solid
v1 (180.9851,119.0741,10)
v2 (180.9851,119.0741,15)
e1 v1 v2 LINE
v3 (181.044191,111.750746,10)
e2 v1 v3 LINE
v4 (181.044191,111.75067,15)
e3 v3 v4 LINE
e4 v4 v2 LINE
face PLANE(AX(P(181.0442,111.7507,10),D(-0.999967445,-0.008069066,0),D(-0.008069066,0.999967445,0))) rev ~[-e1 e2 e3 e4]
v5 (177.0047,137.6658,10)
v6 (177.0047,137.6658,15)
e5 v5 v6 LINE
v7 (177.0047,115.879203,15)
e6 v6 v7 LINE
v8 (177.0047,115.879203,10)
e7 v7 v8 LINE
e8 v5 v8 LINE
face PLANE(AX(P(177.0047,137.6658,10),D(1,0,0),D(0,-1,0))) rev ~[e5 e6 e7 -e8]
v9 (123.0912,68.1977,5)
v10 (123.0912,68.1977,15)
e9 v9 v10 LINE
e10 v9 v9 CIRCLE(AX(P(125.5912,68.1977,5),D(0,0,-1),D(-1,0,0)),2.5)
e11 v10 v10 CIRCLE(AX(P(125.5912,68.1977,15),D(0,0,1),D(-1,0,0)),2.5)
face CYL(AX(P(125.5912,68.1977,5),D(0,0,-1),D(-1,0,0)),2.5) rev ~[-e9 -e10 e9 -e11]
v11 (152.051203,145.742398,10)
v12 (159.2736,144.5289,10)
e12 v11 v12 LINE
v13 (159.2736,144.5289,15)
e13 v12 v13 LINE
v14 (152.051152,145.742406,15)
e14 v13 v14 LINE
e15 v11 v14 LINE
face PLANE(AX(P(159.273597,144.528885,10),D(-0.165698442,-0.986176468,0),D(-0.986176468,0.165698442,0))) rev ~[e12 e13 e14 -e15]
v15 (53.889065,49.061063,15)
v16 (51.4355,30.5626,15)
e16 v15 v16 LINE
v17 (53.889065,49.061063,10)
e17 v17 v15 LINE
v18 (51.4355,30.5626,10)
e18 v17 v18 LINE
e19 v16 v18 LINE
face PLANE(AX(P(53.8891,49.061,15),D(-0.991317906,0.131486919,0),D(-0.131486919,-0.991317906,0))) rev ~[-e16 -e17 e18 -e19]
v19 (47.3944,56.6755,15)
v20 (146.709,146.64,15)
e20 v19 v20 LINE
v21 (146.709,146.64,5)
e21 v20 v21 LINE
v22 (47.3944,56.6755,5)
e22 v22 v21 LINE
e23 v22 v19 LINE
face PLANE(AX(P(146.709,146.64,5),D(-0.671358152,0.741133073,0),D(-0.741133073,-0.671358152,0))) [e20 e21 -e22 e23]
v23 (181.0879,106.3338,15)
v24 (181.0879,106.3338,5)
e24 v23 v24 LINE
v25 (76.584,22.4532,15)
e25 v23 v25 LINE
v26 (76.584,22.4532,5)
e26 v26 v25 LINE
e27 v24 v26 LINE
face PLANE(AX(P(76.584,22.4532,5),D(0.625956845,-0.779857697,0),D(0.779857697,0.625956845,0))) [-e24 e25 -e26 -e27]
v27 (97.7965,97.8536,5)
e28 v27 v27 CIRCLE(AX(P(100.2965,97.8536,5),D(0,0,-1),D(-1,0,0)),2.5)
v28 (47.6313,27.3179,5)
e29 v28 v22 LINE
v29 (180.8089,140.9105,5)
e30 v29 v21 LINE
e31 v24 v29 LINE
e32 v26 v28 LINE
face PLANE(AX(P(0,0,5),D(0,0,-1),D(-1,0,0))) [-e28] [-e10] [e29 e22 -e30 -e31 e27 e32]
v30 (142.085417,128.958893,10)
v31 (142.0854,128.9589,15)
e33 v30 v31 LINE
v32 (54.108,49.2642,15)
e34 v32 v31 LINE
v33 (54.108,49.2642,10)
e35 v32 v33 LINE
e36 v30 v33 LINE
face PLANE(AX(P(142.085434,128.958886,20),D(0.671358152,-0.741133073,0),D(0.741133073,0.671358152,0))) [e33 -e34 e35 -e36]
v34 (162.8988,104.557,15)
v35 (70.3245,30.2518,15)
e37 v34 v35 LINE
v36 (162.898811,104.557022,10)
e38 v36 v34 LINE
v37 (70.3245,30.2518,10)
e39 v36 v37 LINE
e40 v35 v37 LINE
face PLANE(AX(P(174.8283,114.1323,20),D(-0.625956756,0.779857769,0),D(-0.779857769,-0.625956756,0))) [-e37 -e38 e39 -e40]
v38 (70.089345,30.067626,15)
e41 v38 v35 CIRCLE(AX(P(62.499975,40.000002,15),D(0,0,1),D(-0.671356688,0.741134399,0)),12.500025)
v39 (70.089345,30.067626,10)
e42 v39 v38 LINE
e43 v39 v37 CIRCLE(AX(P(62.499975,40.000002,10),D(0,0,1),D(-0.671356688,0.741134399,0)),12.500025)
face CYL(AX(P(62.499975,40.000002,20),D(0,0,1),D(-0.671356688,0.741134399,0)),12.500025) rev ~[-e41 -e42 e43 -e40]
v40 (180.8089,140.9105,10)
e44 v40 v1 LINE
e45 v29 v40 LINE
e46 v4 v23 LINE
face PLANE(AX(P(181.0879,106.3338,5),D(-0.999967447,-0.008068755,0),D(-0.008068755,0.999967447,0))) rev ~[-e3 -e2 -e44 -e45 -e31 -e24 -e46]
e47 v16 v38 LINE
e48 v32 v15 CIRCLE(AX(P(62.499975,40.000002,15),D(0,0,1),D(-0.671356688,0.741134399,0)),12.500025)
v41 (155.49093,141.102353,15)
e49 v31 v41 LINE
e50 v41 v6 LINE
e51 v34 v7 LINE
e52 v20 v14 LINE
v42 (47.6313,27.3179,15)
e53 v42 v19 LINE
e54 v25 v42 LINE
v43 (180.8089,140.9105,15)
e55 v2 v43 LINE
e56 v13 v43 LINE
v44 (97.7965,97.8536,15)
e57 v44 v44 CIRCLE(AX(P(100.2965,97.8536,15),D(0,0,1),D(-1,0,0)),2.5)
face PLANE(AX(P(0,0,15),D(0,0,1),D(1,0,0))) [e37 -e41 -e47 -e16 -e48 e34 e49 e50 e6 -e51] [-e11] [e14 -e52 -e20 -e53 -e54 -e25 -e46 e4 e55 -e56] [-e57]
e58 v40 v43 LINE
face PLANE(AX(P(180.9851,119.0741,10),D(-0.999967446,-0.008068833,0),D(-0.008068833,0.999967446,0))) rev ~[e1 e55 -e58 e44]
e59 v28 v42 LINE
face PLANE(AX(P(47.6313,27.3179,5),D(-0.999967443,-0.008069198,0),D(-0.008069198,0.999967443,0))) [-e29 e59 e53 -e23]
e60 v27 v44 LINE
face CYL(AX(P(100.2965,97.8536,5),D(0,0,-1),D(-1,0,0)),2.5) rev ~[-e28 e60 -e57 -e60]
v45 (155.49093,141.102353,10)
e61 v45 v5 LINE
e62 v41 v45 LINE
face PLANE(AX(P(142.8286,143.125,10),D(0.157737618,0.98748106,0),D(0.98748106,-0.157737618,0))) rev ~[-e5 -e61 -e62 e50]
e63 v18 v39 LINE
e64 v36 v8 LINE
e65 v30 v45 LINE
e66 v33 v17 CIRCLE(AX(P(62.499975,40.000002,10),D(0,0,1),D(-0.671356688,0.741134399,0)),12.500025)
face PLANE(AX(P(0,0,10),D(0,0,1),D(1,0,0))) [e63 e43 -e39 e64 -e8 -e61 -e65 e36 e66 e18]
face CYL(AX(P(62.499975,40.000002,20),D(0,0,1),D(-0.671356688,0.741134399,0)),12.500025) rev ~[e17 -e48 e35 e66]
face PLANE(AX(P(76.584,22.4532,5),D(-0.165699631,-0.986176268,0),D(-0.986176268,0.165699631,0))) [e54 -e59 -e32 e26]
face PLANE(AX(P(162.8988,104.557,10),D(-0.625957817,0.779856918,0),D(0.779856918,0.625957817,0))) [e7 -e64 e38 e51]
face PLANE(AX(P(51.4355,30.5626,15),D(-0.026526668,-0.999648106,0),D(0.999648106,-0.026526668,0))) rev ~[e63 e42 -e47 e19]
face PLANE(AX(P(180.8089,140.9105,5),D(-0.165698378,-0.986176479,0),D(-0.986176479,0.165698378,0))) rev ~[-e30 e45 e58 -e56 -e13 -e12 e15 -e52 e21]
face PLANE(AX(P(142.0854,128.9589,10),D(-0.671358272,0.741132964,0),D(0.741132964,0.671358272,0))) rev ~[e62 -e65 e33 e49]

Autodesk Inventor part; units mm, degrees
ref_plane "XZ Plane" through (0, 0, 0) normal (0, 1, 0) x (-1, 0, 0)
ref_plane "XY Plane" through (0, 0, 0) normal (0, 0, 1) x (1, 0, 0)
sketch "Sketch1" plane through (0, 0, 0) normal (0, 0, 1) x (1, 0, 0)
  line L0 (0, 0) -> (100, 0)
  line L1 (100, 0) -> (100, 25)
  line L2 (100, 25) -> (0, 25)
  line L3 (0, 25) -> (0, 0)
  line L4 (0, 25) -> (115.2078, 140.2078)
  line L5 (100, 0) -> (177.7078, 77.7078)
  line L6 (151.2922, 176.2922) -> (200.5844, 163.0844)
  line L7 (200.5844, 163.0844) -> (213.7922, 113.7922)
  line L8 (213.7922, 113.7922) -> (177.7078, 77.7078)
  line L9 (177.7078, 77.7078) -> (128.4156, 90.9156)
  line L10 (128.4156, 90.9156) -> (115.2078, 140.2078)
  line L11 (115.2078, 140.2078) -> (151.2922, 176.2922)
  circle A0 centre (164.5, 127) radius 4
  dimension "d0" = 100
  dimension "d1" = 25
  dimension "d6" = 8
  dimension "d8" = 45
  dimension "d15" = 127
extrude "Extrusion1" add sketch "Sketch1" along normal blind 20
sketch "Sketch2" plane through (0, 0, 20) normal (0, 0, 1) x (1, 0, 0)
  line L0 (0, 25) -> (0, 0) projected
  line L1 (0, 0) -> (100, 0) projected
  line L2 (0, 25) -> (100, 25)
  line L3 (100, 25) -> (100, 0)
  line L4 (100, 0) -> (0, 0)
  line L5 (0, 0) -> (0, 25)
  line L6 (100, 25) -> (125, 25)
  line L7 (100, 0) -> (213.7922, 113.7922) projected
  line L8 (100, 0) -> (125, 25)
extrude "Extrusion2" add sketch "Sketch2" along normal blind 250
sketch "Sketch4" plane through (0, 0, 270) normal (0, 0, 1) x (1, 0, 0)
  line L0 (0, 25) -> (125, 25) projected
  line L1 (125, 25) -> (213.7922, 113.7922) projected
  line L2 (213.7922, 113.7922) -> (200.5844, 163.0844) projected
  line L3 (200.5844, 163.0844) -> (151.2922, 176.2922) projected
  line L4 (151.2922, 176.2922) -> (0, 25) projected
  circle A0 centre (164.5, 127) radius 4 projected
  line L5 (100, 0) -> (125, 25) projected
  line L6 (125, 25) -> (0, 25) projected
  line L7 (0, 25) -> (0, 0) projected
  line L8 (0, 0) -> (100, 0) projected
extrude "Extrusion3" add sketch "Sketch4" along normal blind 20
sketch "Sketch5" plane through (0, 0, 0) normal (0, -1, 0) x (1, 0, 0)
  line L0 (0, 0) -> (100, 0) projected
  line L1 (100, 0) -> (100, 290) projected
  line L2 (0, 290) -> (100, 290) projected
  line L3 (0, 0) -> (0, 290) projected
  line L4 (0, 0) -> (-125.5737, 72.5)
  line L5 (-125.5737, 72.5) -> (-125.5737, 217.5)
  line L6 (-125.5737, 217.5) -> (0, 290)
  line L7 (0, 290) -> (125.5737, 217.5)
  line L8 (125.5737, 217.5) -> (125.5737, 72.5)
  line L9 (125.5737, 72.5) -> (0, 0)
  point P0 (0, 145)
extrude "Extrusion4" add sketch "Sketch5" against normal blind 25 contours L4 L5 L6 L3
sketch "Sketch6" plane through (0, 25, 20) normal (0, 1, 0) x (1, 0, 0)
  line L0 (100, 20) -> (100, -270) projected
  circle A0 centre (-24.528, -125) radius 3
  circle A1 centre (-31.528, -125) radius 1.5
  circle A2 centre (-21.028, -131.0622) radius 1.5
  circle A3 centre (-21.028, -118.9378) radius 1.5
  point P0 (0, 20)
  point P1 (100, -125)
  dimension "d18" = 6
  dimension "d19" = 124.528
  dimension "d20" = 3
  dimension "d21" = 7
  dimension "d24" = 360
extrude "Extrusion5" cut sketch "Sketch6" against normal through all
sketch "Sketch7" plane through (100, 0, 0) normal (0, -1, 0) x (1, 0, 0)
  circle A0 centre (-124.528, 145) radius 3 projected
  circle A1 centre (-124.528, 145) radius 12
  point P0 (-100, 0)
  dimension "d28" = 24
extrude "Extrusion6" cut sketch "Sketch7" against normal blind 5
sketch "Sketch8" plane through (0, 0, 270) normal (0, 0, -1) x (-1, 0, 0)
  circle A0 centre (-164.5, 127) radius 4 projected
  circle A1 centre (-164.5, 127) radius 12.5
  point P0 (0, 0)
  dimension "d31" = 25
extrude "Extrusion7" cut sketch "Sketch8" against normal blind 7
sketch "Sketch10" plane through (164.5, 127, 277) normal (0, 0, -1) x (-1, 0, 0)
  circle A0 centre (7, 0) radius 2
  circle A1 centre (0, 0) radius 4 projected
  circle A2 centre (-3.5, 6.0622) radius 2
  circle A3 centre (-3.5, -6.0622) radius 2
  point P0 (164.5, -127)
  dimension "d34" = 4
  dimension "d37" = 360
  dimension "d39" = 7
extrude "Extrusion8" cut sketch "Sketch10" against normal through all
sketch "Sketch11" plane through (0, 0, 290) normal (0, 0, 1) x (1, 0, 0)
  circle A0 centre (168, 133.0622) radius 2 projected
  circle A1 centre (164.5, 127) radius 4 projected
  circle A2 centre (168, 133.0622) radius 4
  circle A3 centre (157.5, 127) radius 4
  circle A4 centre (168, 120.9378) radius 4
  point P0 (0, 0)
  dimension "d42" = 8
  dimension "d45" = 360
extrude "Extrusion9" cut sketch "Sketch11" against normal blind 3 contours A0 | A1 A4 A3 A2 | A2 A1 | A1 A2 | A4 A1 | A1 A4 | A3 A1 | A1 A3
ref_plane "Work Plane1" through (164.5, 127, 270) normal (1, 0, 0) x (0, 0, 1)
sketch "Sketch12" plane through (164.5, 127, 270) normal (1, 0, 0) x (0, 0, 1)
  line L0 (17, -1.9365) -> (17, 1.9365) projected
  line L1 (17, 1.9365) -> (20, 1.9365) projected
  line L2 (20, 3.9993) -> (20, 1.9365) projected
  line L3 (20, 3.9993) -> (17, 3.9993) projected
  line L4 (17, 3.9993) -> (17, 2.0628) projected
  line L5 (17, 2.0628) -> (20, 2.0628) projected
  line L6 (20, -2.0628) -> (20, 2.0628) projected
  line L7 (20, -2.0628) -> (17, -2.0628) projected
  line L8 (17, -2.0628) -> (17, -3.9993) projected
  line L9 (17, -3.9993) -> (20, -3.9993) projected
  line L10 (20, -1.9365) -> (20, -3.9993) projected
  line L11 (20, -1.9365) -> (17, -1.9365) projected
  line L12 (7, 4) -> (7, -4) projected
  line L13 (7, -12.5) -> (7, 12.5) projected
  line L14 (0, -12.5) -> (0, 12.5) projected
  circle A0 centre (3.5, 0) radius 2
  line L15 (0, -12.5) -> (7, -12.5) projected
  point P0 (-270, 127)
  point P1 (7, 0)
  point P2 (3.5, -12.5)
  dimension "d50" = 4
extrude "Extrusion10" cut sketch "Sketch12" along normal through all contours A0
sketch "Sketch13" plane through (0, 0, 20) normal (0, 0, 1) x (1, 0, 0)
  line L0 (100, 0) -> (213.7922, 113.7922) projected
  line L1 (213.7922, 113.7922) -> (200.5844, 163.0844) projected
  line L2 (200.5844, 163.0844) -> (151.2922, 176.2922) projected
  line L3 (151.2922, 176.2922) -> (0, 25) projected
  line L4 (0, 25) -> (0, 0) projected
  line L5 (0, 0) -> (100, 0) projected
  arc A0 (161, 128.9365) -> (161, 125.0635) centre (157.5, 127) ccw projected
  arc A1 (164.5729, 130.9993) -> (161, 128.9365) centre (164.5, 127) ccw projected
  arc A2 (167.9271, 129.0628) -> (164.5729, 130.9993) centre (168, 133.0622) ccw projected
  arc A3 (167.9271, 124.9372) -> (167.9271, 129.0628) centre (164.5, 127) ccw projected
  arc A4 (164.5729, 123.0007) -> (167.9271, 124.9372) centre (168, 120.9378) ccw projected
  arc A5 (161, 125.0635) -> (164.5729, 123.0007) centre (164.5, 127) ccw projected
  line L6 (-125.5737, 25) -> (0, 25) projected
  line L7 (0, 0) -> (-125.5737, 0) projected
  line L8 (0, 25) -> (0, 0) projected
  line L9 (-125.5737, 25) -> (0, 25) projected
  line L10 (-125.5737, 0) -> (-125.5737, 25) projected
extrude "Extrusion11" cut sketch "Sketch13" along normal through all contours L5 L4 L3 L2 L1 L0 | L7 L10 L6 L4 | A1 A2 A3 A4 A5 A0
sketch "Sketch14" plane through (0, 0, 20) normal (0, 0, 1) x (1, 0, 0)
  line L0 (-34.641, 0) -> (0, 0) projected
  line L1 (151.2922, 176.2922) -> (0, 25) projected
  line L2 (0, 0) -> (0, 25)
  line L3 (-34.641, 0) -> (-34.641, 25) projected
  line L4 (0, 25) -> (-34.641, 25)
  line L5 (-34.641, 25) -> (-34.641, 0)
  line L6 (-34.641, 0) -> (0, 0)
extrude "Extrusion12" cut sketch "Sketch14" against normal through all
sketch "Sketch15" plane through (0, 0, 20) normal (0, 0, 1) x (1, 0, 0)
  line L0 (15, 12.5) -> (90, 12.5) construction
  line L1 (0, 0) -> (100, 0) projected
  circle A0 centre (15, 12.5) radius 2.5
  circle A1 centre (90, 12.5) radius 2.5
  dimension "d57" = 75
  dimension "d58" = 12.5
  dimension "d59" = 10
  dimension "d60" = 5
  dimension "d61" = 5
extrude "Extrusion13" cut sketch "Sketch15" against normal through all
sketch "Sketch16" plane through (0, 0, 20) normal (0, 0, 1) x (1, 0, 0)
  circle A0 centre (164.5, 127) radius 4 projected
  circle A1 centre (164.5, 127) radius 11.5
  point P0 (0, 0)
  dimension "d64" = 23
extrude "Extrusion14" cut sketch "Sketch16" against normal through all
sketch "Sketch17" plane through (0, 0, 20) normal (0, 0, 1) x (1, 0, 0)
  circle A0 centre (164.5, 127) radius 11.5 projected
  circle A1 centre (164.5, 127) radius 22.5
  point P0 (0, 0)
  dimension "d67" = 45
extrude "Extrusion15" cut sketch "Sketch17" against normal blind 10
sketch "Sketch18" plane through (0, 0, 20) normal (0, 0, 1) x (1, 0, 0)
  circle A0 centre (62.5, 40) radius 7.5
  line L0 (0, 25) -> (0, 0) projected
  line L1 (0, 25) -> (125, 25)
  line L2 (100, 0) -> (213.7922, 113.7922) projected
  point P0 (62.5, 25)
  dimension "d70" = 15
  dimension "d71" = 15
extrude "Extrusion16" cut sketch "Sketch18" against normal through all
sketch "Sketch19" plane through (0, 0, 0) normal (0, 0, -1) x (-1, 0, 0)
  line L0 (-156.7794, 135.523) -> (-57.4648, 45.5585)
  circle A0 centre (-62.5, 40) radius 7.5 projected
  line L1 (-67.1947, 34.1511) -> (-171.6985, 118.0316)
  circle A1 centre (-164.5, 127) radius 11.5 projected
  circle A2 centre (-62.5, 40) radius 7.5 projected
  arc A3 (-156.7794, 135.523) -> (-171.6985, 118.0316) centre (-164.5, 127) ccw
  arc A4 (-67.1947, 34.1511) -> (-57.4648, 45.5585) centre (-62.5, 40) ccw
  point P0 (0, 0)
extrude "Extrusion17" cut sketch "Sketch19" against normal blind 4
sketch "Sketch20" plane through (0, 0, 0) normal (0, 0, -1) x (-1, 0, 0)
  arc A0 (-156.7794, 135.523) -> (-171.6985, 118.0316) centre (-164.5, 127) ccw projected
  line L0 (-156.7794, 135.523) -> (-57.4648, 45.5585) projected
  line L1 (-67.1947, 34.1511) -> (-171.6985, 118.0316) projected
  arc A1 (-67.1947, 34.1511) -> (-57.4648, 45.5585) centre (-62.5, 40) ccw projected
  line L2 (-47.3944, 56.6755) -> (-146.709, 146.64)
  arc A2 (-146.709, 146.64) -> (-181.0879, 106.3338) centre (-164.5, 127) ccw
  line L3 (-181.0879, 106.3338) -> (-76.584, 22.4532)
  arc A3 (-76.584, 22.4532) -> (-47.3944, 56.6755) centre (-62.5, 40) ccw
  point P0 (0, 0)
  dimension "d76" = 15
extrude "Extrusion18" cut sketch "Sketch20" against normal blind 5 contours L0 A1 L1 A0 | A3 L3 A2 L2
sketch "Sketch21" plane through (0, 0, 5) normal (0, 0, -1) x (-1, 0, 0)
  circle A0 centre (-62.5, 40) radius 7.5 projected
  circle A1 centre (-164.5, 127) radius 11.5 projected
  line L0 (-146.709, 146.64) -> (-47.3944, 56.6755) projected
  arc A2 (-146.709, 146.64) -> (-181.0879, 106.3338) centre (-164.5, 127) ccw projected
  line L1 (-76.584, 22.4532) -> (-181.0879, 106.3338) projected
  arc A3 (-76.584, 22.4532) -> (-47.3944, 56.6755) centre (-62.5, 40) ccw projected
  line L2 (-76.584, 22.4532) -> (-181.0879, 106.3338) projected
  line L3 (-128.8359, 64.3935) -> (-97.0517, 101.6578) construction
  line L4 (-146.709, 146.64) -> (-47.3944, 56.6755) projected
  circle A4 centre (-125.5912, 68.1977) radius 2.5
  circle A5 centre (-100.2965, 97.8536) radius 2.5
  point P0 (0, 0)
  dimension "d79" = 5
  dimension "d80" = 5
  dimension "d81" = 5
  dimension "d82" = 5
extrude "Extrusion19" cut sketch "Sketch21" against normal through all contours A4 | A5
sketch "Sketch22" plane through (0, 0, 5) normal (0, 0, -1) x (-1, 0, 0)
  circle A0 centre (-125.5912, 68.1977) radius 2.5 projected
  circle A1 centre (-100.2965, 97.8536) radius 2.5 projected
  circle A2 centre (-62.5, 40) radius 7.5 projected
  circle A3 centre (-164.5, 127) radius 11.5 projected
  line L0 (-146.709, 146.64) -> (-47.3944, 56.6755) projected
  arc A4 (-146.709, 146.64) -> (-181.0879, 106.3338) centre (-164.5, 127) ccw projected
  line L1 (-76.584, 22.4532) -> (-181.0879, 106.3338) projected
  arc A5 (-76.584, 22.4532) -> (-47.3944, 56.6755) centre (-62.5, 40) ccw projected
  arc A6 (-146.709, 146.64) -> (-181.0879, 106.3338) centre (-164.5, 127) ccw projected
  line L2 (-146.709, 146.64) -> (-47.3944, 56.6755) projected
  arc A7 (-76.584, 22.4532) -> (-47.3944, 56.6755) centre (-62.5, 40) ccw projected
  line L3 (-76.584, 22.4532) -> (-181.0879, 106.3338) projected
  line L4 (0, 0) -> (-100, 0) projected
  line L5 (0, 25) -> (0, 0) projected
  line L6 (-151.2922, 176.2922) -> (0, 25) projected
  line L7 (-200.5844, 163.0844) -> (-151.2922, 176.2922) projected
  line L8 (-213.7922, 113.7922) -> (-200.5844, 163.0844) projected
  line L9 (-100, 0) -> (-213.7922, 113.7922) projected
  circle A8 centre (-90, 12.5) radius 2.5 projected
  circle A9 centre (-15, 12.5) radius 2.5 projected
extrude "Extrusion20" cut sketch "Sketch22" along normal through all both and the other way through all contours L4 L9 L8 L7 L6 L5
sketch "Sketch23" plane through (0, 0, 20) normal (0, 0, 1) x (1, 0, 0)
  line L0 (76.584, 22.4532) -> (181.0879, 106.3338) projected
  arc A0 (47.3944, 56.6755) -> (76.584, 22.4532) centre (62.5, 40) ccw projected
  line L1 (76.584, 22.4532) -> (181.0879, 106.3338) projected
  arc A1 (181.0879, 106.3338) -> (146.709, 146.64) centre (164.5, 127) ccw projected
  line L2 (146.709, 146.64) -> (47.3944, 56.6755) projected
  circle A2 centre (125.5912, 68.1977) radius 2.5 projected
  circle A3 centre (100.2965, 97.8536) radius 2.5 projected
  circle A4 centre (62.5, 40) radius 7.5 projected
  circle A5 centre (164.5, 127) radius 22.5 projected
  arc A6 (174.8283, 114.1323) -> (153.4226, 139.2287) centre (164.5, 127) ccw
  line L3 (174.8283, 114.1323) -> (70.3245, 30.2518)
  arc A7 (54.108, 49.2642) -> (70.3245, 30.2518) centre (62.5, 40) ccw
  line L4 (54.108, 49.2642) -> (153.4226, 139.2287)
  point P0 (0, 0)
  dimension "d87" = 10
extrude "Extrusion21" cut sketch "Sketch23" against normal blind 10 contours L4 A6 L3 A5 | A5 L3 A7 L4 picked at (159.1311, 121.3058)
sketch "Sketch24" plane through (0, 0, 10) normal (0, 0, 1) x (1, 0, 0)
  circle A0 centre (62.5, 40) radius 7.5 projected
  circle A1 centre (164.5, 127) radius 11.5 projected
  point P0 (0, 0)
extrude "Extrusion22" add sketch "Sketch24" against normal blind 5
sketch "Sketch25" plane through (0, 0, 20) normal (0, 0, 1) x (1, 0, 0)
  line L0 (54.108, 49.2642) -> (142.0854, 128.9589) projected
  arc A0 (162.8988, 104.557) -> (142.0854, 128.9589) centre (164.5, 127) ccw projected
  line L1 (162.8988, 104.557) -> (70.3245, 30.2518) projected
  arc A1 (54.108, 49.2642) -> (70.3245, 30.2518) centre (62.5, 40) ccw projected
  arc A2 (47.3944, 56.6755) -> (76.584, 22.4532) centre (62.5, 40) ccw projected
  line L2 (76.584, 22.4532) -> (181.0879, 106.3338) projected
  arc A3 (181.0879, 106.3338) -> (146.709, 146.64) centre (164.5, 127) ccw projected
  line L3 (146.709, 146.64) -> (47.3944, 56.6755) projected
  circle A4 centre (125.5912, 68.1977) radius 2.5 projected
  circle A5 centre (100.2965, 97.8536) radius 2.5 projected
  point P0 (0, 0)
extrude "Extrusion23" cut sketch "Sketch25" against normal blind 5
sketch "Sketch26" plane through (0, 0, 5) normal (0, 0, -1) x (-1, 0, 0)
  arc A0 (-146.709, 146.64) -> (-181.0879, 106.3338) centre (-164.5, 127) ccw projected
  line L0 (-164.5, 127) -> (-180.8089, 140.9105)
  arc A1 (-76.584, 22.4532) -> (-47.3944, 56.6755) centre (-62.5, 40) ccw projected
  line L1 (-164.5, 127) -> (-62.5, 40)
  line L2 (-181.0879, 106.3338) -> (-180.8089, 140.9105)
  line L3 (-180.8089, 140.9105) -> (-146.709, 146.64)
  point P0 (0, 0)
  dimension "d95" = 100
extrude "Extrusion24" cut sketch "Sketch26" against normal through all
sketch "Sketch27" plane through (0, 0, 5) normal (0, 0, -1) x (-1, 0, 0)
  arc A0 (-76.584, 22.4532) -> (-47.3944, 56.6755) centre (-62.5, 40) ccw projected
  line L0 (-76.584, 22.4532) -> (-76.584, 22.4532)
  line L1 (-181.0879, 106.3338) -> (-76.584, 22.4532) projected
  arc A1 (-76.584, 22.4532) -> (-47.3944, 56.6755) centre (-62.5, 40) ccw projected
  line L2 (-76.584, 22.4532) -> (-47.3944, 56.6755)
  point P0 (0, 0)
extrude "Extrusion25" cut sketch "Sketch27" against normal through all
sketch "Sketch28" plane through (0, 0, 5) normal (0, 0, -1) x (-1, 0, 0)
  line L0 (-76.584, 22.4532) -> (-47.3944, 56.6755) projected
  line L1 (-76.584, 22.4532) -> (-47.6313, 27.3179)
  line L2 (-47.6313, 27.3179) -> (-47.3944, 56.6755)
  line L3 (-180.8089, 140.9105) -> (-47.6313, 27.3179)
  point P0 (0, 0)
  point P1 (-61.9892, 39.5643)
  dimension "d101" = 100
extrude "Extrusion26" add sketch "Sketch28" against normal blind 10
sketch "Sketch30" plane through (0, 0, 15) normal (0, 0, 1) x (1, 0, 0)
  line L0 (70.0894, 30.0676) -> (53.8891, 49.061) projected
  line L1 (53.8891, 49.061) -> (51.4355, 30.5626)
  line L2 (51.4355, 30.5626) -> (70.0894, 30.0676)
  line L3 (76.584, 22.4532) -> (47.6313, 27.3179) projected
  line L4 (47.6313, 27.3179) -> (61.9892, 39.5643)
  point P0 (0, 0)
  dimension "d105" = 5
extrude "Extrusion27" cut sketch "Sketch30" against normal blind 5
sketch "Sketch31" plane through (0, 0, 10) normal (0, 0, 1) x (1, 0, 0)
  line L0 (180.8089, 140.9105) -> (152.0512, 145.7424) projected
  line L1 (181.0442, 111.7507) -> (180.8089, 140.9105) projected
  line L2 (162.8988, 104.557) -> (180.9851, 119.0741)
  line L3 (70.3245, 30.2518) -> (162.8988, 104.557) projected
  line L4 (162.8988, 104.557) -> (162.8988, 91.7342)
  line L5 (76.584, 22.4532) -> (181.0879, 106.3338) projected
  line L6 (181.0879, 106.3338) -> (181.0442, 111.7507) projected
  line L7 (181.0879, 106.3338) -> (162.8988, 91.7342)
  line L8 (181.0879, 106.3338) -> (180.9851, 119.0741)
  line L9 (180.8089, 140.9105) -> (181.0879, 106.3338) projected
  line L10 (47.3944, 56.6755) -> (47.6313, 27.3179) projected
  line L11 (47.6313, 27.3179) -> (180.8089, 140.9105)
  line L12 (152.0512, 145.7424) -> (180.8089, 140.9105)
  line L13 (142.0854, 128.9589) -> (159.2736, 144.5289)
  line L14 (54.108, 49.2642) -> (142.0854, 128.9589)
  line L15 (142.0854, 128.9589) -> (129.4231, 130.9815)
  line L16 (47.3944, 56.6755) -> (146.709, 146.64)
  line L17 (146.709, 146.64) -> (152.0512, 145.7424)
  line L18 (146.709, 146.64) -> (129.4231, 130.9815)
  line L19 (146.709, 146.64) -> (159.2736, 144.5289)
  line L20 (180.8089, 140.9105) -> (146.709, 146.64)
  point P0 (0, 0)
extrude "Extrusion28" add sketch "Sketch31" along normal blind 5 contours L13 L15 L16 L17 L0 | L6 L5 L4 L2 L1
sketch "Sketch32" plane through (0, 0, 10) normal (0, 0, 1) x (1, 0, 0)
  line L0 (142.8286, 143.125) -> (177.0047, 137.6658)
  line L1 (177.0047, 137.6658) -> (177.0047, 103.0564)
  line L2 (76.584, 22.4532) -> (181.0879, 106.3338) projected
  line L3 (142.8286, 143.125) -> (177.0047, 103.0564)
  line L4 (47.3944, 56.6755) -> (47.6313, 27.3179) projected
  line L5 (180.9851, 119.0741) -> (180.8089, 140.9105) projected
  line L6 (47.6313, 27.3179) -> (180.8089, 140.9105)
  line L7 (146.709, 146.64) -> (47.3944, 56.6755) projected
  line L8 (142.8286, 143.125) -> (146.709, 146.64)
  line L9 (146.709, 146.64) -> (180.8089, 140.9105) projected
  line L10 (146.709, 146.64) -> (180.8089, 140.9105)
  line L11 (180.8089, 140.9105) -> (181.0879, 106.3338)
  line L12 (181.0879, 106.3338) -> (177.0047, 103.0564)
  point P0 (0, 0)
  point P1 (159.9167, 123.0907)
  dimension "d110" = 5
extrude "Extrusion29" add sketch "Sketch32" along normal blind 5 contours L7 L9 L6 L0 | L6 L5 L11 L2 L1
properties part number "HA02" material "ABS Plastic"
